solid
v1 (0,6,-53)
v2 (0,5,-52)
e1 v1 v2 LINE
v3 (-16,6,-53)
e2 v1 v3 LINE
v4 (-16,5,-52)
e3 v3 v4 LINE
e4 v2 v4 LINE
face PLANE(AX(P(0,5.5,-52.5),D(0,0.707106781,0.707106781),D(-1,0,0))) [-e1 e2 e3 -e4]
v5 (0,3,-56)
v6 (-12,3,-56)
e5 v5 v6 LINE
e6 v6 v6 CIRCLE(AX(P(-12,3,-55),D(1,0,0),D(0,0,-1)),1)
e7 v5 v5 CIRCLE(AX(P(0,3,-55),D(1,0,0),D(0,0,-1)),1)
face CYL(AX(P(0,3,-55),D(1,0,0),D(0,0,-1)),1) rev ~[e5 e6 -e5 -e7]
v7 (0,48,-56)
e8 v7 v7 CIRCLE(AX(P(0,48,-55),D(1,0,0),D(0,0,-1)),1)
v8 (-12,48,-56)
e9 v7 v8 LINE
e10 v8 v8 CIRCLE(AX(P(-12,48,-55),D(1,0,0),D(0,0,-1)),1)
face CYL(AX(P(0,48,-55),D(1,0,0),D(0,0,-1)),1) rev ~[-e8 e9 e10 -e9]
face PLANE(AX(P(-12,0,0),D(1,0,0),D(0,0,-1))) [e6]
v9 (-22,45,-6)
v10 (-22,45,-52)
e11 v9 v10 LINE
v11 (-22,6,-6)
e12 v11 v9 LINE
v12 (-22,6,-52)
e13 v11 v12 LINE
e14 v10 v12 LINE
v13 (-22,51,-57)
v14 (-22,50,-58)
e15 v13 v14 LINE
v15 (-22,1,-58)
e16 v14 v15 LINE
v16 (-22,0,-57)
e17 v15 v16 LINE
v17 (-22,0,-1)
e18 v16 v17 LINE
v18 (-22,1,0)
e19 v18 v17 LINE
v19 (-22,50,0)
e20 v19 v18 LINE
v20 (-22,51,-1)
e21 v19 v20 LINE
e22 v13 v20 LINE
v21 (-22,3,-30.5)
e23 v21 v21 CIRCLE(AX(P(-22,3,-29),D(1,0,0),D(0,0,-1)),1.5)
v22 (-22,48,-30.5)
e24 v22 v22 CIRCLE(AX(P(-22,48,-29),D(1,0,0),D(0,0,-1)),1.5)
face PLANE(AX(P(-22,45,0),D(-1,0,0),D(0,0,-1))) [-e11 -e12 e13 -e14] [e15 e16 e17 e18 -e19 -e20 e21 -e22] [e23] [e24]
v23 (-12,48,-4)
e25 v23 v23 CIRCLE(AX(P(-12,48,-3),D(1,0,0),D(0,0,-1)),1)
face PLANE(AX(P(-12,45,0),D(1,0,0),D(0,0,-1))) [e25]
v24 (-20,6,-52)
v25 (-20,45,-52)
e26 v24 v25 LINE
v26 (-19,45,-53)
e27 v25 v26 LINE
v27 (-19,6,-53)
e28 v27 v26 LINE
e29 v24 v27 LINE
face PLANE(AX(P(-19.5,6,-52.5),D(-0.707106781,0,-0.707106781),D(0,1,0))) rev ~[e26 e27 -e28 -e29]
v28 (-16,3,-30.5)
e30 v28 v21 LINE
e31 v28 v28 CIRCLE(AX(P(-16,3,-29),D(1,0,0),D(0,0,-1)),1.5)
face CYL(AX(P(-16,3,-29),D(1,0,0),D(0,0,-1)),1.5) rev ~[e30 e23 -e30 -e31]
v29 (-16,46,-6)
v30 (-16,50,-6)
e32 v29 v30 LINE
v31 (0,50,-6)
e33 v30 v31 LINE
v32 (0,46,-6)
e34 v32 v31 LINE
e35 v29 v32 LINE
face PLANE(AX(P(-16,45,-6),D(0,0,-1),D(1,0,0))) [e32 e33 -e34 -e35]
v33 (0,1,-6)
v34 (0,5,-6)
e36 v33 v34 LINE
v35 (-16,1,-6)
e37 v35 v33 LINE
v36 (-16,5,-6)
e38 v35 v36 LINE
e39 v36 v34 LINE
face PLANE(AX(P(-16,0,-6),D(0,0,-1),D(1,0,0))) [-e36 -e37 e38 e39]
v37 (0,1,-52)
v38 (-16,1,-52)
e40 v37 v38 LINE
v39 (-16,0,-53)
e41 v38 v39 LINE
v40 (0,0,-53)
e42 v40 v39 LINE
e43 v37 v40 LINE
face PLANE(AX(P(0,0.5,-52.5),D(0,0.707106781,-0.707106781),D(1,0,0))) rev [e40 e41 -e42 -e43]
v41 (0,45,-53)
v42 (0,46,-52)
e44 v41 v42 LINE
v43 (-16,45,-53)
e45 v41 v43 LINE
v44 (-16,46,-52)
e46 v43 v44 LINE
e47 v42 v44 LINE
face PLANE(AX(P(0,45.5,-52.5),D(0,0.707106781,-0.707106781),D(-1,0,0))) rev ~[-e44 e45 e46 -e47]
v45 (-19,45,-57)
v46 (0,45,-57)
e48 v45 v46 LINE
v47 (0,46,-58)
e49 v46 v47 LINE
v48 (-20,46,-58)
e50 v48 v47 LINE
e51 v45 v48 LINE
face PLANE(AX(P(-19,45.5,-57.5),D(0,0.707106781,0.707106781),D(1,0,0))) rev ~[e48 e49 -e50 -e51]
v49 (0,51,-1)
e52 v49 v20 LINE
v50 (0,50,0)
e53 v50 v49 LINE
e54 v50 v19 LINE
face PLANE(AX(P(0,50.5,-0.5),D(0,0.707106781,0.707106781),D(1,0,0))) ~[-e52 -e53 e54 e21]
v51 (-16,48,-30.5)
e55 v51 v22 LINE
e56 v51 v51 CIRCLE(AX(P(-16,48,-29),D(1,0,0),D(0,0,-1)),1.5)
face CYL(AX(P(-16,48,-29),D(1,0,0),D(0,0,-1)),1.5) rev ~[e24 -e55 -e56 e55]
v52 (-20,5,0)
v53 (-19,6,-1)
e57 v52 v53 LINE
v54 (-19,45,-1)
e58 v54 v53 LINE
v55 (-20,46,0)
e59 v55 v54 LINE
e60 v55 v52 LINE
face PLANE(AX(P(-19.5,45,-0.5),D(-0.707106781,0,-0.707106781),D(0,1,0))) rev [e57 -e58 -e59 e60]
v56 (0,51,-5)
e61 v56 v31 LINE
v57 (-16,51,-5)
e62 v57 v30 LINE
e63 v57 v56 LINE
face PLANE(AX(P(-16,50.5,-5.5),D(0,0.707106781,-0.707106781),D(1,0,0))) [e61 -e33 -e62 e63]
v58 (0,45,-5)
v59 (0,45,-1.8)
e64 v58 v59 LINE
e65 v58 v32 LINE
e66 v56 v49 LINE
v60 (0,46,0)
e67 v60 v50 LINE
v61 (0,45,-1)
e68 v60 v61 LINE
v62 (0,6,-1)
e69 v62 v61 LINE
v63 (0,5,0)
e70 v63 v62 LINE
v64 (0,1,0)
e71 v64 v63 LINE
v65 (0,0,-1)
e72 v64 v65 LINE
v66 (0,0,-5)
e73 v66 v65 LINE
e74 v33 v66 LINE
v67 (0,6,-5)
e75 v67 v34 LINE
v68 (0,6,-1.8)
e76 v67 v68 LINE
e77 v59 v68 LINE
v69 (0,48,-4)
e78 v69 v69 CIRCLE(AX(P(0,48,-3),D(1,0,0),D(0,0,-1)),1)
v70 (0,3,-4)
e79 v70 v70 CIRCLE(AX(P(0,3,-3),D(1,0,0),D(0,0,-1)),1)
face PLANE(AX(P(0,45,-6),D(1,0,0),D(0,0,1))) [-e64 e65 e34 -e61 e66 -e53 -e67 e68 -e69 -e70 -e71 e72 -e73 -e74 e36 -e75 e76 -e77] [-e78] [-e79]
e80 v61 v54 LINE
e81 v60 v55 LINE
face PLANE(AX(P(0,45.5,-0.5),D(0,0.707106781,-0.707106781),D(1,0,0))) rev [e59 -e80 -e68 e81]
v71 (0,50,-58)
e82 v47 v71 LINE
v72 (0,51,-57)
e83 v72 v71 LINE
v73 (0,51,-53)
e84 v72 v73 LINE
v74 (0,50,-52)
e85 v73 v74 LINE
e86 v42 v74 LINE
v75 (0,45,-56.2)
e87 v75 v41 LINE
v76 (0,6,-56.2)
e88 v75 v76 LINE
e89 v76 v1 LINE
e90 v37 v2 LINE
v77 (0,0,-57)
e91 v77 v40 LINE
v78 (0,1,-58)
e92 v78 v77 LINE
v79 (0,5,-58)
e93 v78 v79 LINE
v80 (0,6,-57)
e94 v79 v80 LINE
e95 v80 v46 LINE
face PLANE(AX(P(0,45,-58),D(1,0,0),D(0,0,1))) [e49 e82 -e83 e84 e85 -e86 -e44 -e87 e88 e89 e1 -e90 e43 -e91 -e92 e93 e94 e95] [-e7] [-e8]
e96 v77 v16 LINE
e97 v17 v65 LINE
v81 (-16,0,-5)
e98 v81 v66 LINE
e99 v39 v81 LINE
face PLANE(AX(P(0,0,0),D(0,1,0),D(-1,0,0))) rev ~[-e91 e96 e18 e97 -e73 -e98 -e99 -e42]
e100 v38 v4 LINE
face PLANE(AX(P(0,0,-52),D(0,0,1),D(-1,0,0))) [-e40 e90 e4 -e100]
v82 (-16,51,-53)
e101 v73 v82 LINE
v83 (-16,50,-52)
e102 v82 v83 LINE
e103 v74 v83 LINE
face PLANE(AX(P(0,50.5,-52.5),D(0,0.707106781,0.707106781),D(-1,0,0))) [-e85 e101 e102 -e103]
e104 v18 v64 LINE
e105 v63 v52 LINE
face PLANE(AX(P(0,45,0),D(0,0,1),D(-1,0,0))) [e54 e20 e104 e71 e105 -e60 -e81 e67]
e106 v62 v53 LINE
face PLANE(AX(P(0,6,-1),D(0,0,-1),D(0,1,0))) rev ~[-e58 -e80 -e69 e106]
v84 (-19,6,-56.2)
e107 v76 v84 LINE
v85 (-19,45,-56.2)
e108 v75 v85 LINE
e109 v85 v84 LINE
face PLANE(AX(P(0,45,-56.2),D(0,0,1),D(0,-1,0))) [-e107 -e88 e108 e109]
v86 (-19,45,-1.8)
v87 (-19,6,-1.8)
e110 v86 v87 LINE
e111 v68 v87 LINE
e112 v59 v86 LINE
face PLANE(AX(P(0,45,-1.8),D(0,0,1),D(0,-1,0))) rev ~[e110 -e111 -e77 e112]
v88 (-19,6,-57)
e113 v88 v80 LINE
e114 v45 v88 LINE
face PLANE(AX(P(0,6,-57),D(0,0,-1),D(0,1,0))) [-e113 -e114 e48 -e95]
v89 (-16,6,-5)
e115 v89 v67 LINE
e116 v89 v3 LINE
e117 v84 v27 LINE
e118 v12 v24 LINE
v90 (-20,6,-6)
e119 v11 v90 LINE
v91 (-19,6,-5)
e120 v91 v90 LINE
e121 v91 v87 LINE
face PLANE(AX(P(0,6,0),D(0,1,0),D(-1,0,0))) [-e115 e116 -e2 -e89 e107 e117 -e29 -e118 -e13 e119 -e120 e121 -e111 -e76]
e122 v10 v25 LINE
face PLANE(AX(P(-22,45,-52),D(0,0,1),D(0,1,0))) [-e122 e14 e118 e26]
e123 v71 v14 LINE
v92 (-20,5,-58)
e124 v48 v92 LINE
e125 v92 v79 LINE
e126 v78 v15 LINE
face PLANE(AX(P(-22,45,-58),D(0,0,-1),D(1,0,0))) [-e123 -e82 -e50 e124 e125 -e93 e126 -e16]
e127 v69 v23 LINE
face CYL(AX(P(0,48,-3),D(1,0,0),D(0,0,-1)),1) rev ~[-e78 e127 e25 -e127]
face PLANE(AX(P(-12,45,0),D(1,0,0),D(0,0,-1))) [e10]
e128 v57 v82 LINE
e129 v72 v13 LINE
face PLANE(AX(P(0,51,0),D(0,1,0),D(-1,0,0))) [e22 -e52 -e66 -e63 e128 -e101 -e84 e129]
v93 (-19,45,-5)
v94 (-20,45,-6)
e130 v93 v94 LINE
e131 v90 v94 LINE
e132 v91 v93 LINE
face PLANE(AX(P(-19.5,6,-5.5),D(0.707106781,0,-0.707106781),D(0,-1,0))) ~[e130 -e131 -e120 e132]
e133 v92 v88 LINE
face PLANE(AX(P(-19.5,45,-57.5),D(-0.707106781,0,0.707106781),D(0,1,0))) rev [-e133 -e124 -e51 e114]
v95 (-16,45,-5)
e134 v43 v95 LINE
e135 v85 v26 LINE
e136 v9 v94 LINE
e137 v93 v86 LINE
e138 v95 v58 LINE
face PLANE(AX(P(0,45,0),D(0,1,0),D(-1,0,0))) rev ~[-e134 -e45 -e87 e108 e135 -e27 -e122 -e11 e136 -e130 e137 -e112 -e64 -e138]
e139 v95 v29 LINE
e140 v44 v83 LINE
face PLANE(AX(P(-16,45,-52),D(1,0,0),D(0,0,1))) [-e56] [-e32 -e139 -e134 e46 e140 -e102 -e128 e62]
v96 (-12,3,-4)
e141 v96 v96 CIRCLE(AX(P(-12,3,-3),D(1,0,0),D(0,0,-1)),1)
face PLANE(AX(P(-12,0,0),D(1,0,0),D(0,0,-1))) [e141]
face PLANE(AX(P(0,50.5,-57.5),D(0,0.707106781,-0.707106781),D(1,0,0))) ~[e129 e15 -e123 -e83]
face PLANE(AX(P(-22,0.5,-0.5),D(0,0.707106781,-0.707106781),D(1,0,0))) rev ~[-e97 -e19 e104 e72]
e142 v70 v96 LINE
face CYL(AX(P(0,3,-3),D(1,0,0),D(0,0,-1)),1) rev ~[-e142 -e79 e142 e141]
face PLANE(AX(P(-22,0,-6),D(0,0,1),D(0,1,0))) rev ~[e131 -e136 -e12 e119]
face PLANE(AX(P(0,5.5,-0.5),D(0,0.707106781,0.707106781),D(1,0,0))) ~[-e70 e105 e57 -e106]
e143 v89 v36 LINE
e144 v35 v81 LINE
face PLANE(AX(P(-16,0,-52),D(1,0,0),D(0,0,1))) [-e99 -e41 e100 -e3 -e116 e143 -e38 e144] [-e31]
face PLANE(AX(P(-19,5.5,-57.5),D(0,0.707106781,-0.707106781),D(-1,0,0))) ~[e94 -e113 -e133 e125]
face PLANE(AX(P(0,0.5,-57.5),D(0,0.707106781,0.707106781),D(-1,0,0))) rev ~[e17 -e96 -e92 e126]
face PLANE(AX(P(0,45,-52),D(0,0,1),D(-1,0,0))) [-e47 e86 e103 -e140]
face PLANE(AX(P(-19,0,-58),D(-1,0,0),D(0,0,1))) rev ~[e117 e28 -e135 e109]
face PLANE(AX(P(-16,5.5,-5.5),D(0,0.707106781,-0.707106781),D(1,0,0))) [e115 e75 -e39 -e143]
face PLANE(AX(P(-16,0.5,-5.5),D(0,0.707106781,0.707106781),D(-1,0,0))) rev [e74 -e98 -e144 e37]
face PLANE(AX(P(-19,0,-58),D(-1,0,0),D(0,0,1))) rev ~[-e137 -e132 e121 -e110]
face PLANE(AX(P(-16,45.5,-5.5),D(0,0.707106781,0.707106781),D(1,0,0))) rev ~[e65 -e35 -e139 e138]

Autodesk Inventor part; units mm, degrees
ref_plane "YZ Plane" through (0, 0, 0) normal (1, 0, 0) x (0, 1, 0)
ref_plane "XZ Plane" through (0, 0, 0) normal (0, 1, 0) x (-1, 0, 0)
ref_plane "XY Plane" through (0, 0, 0) normal (0, 0, 1) x (1, 0, 0)
sketch "Sketch1" plane through (0, 0, 0) normal (0, 1, 0) x (-1, 0, 0)
  line L0 (0, 0) -> (22, 0)
  line L1 (22, 0) -> (22, -58)
  line L2 (22, -58) -> (0, -58)
  line L3 (0, -58) -> (0, -52)
  line L4 (0, -52) -> (16, -52)
  line L5 (16, -52) -> (16, -6)
  line L6 (16, -6) -> (0, -6)
  line L7 (0, -6) -> (0, 0)
  dimension "d0" = 6
  dimension "d1" = 6
  dimension "d2" = 58
  dimension "d3" = 22
extrude "Extrusion1" add sketch "Sketch1" along normal blind 6
sketch "Sketch2" plane through (0, 0, 0) normal (1, 0, 0) x (0, 0, -1)
  line L0 (6, 6) -> (52, 6) projected
  line L1 (0, 0) -> (6, 6) construction
  line L2 (58, 0) -> (58, 6) projected
  line L3 (52, 6) -> (58, 0) construction
  circle A0 centre (3, 3) radius 1
  circle A1 centre (55, 3) radius 1
  dimension "d6" = 2
extrude "Extrusion2" cut sketch "Sketch2" against normal blind 12
sketch "Sketch3" plane through (-16, 0, -6) normal (1, 0, 0) x (0, 0, -1)
  line L0 (0, 6) -> (46, 6) projected
  line L1 (23, 6) -> (23, 0) construction
  circle A0 centre (23, 3) radius 1.5
  line L2 (0, 0) -> (46, 0) projected
  point P0 (-6, 0)
  dimension "d9" = 3
extrude "Extrusion3" cut sketch "Sketch3" against normal through all
pattern_linear "Rectangular Pattern2" count 2 spacing 45 along (0, 1, 0) of "Extrusion1", "Extrusion3", "Extrusion2"
sketch "Sketch5" plane through (-22, 0, -58) normal (-1, 0, 0) x (0, 0, 1)
  line L0 (58, 0) -> (52, 0) projected
  line L1 (52, 51) -> (6, 51) projected
  line L2 (58, 0) -> (52, 0)
  line L3 (52, 0) -> (52, 51)
  line L4 (52, 51) -> (58, 51)
  line L5 (58, 51) -> (58, 0)
  line L6 (6, 0) -> (0, 0) projected
  line L7 (6, 45) -> (6, 51) projected
  line L8 (0, 0) -> (6, 0)
  line L9 (6, 0) -> (6, 51)
  line L10 (6, 51) -> (0, 51)
  line L11 (0, 51) -> (0, 0)
extrude "Extrusion4" add sketch "Sketch5" against normal blind 3
chamfer "Chamfer3" distance 1 angle 45 20 edges at (-11, 51, 0) (-9.5, 45, 0) (-8, 51, -6) (-8, 45, -52) (-8, 51, -52) (-11, 51, -58) (-9.5, 6, -58) (-8, 6, -52) (-8, 0, -52) (-8, 6, -6) (-9.5, 6, 0) (-11, 0, 0) (-8, 45, -6) (-8, 0, -6) (-11, 0, -58) (-9.5, 45, -58) (-19, 25.5, -6) (-19, 25.5, 0) (-19, 25.5, -52) (-19, 25.5, -58)
sketch "Sketch6" plane through (0, 45, -1) normal (1, 0, 0) x (0, 0, -1)
  point P0 (-1, -45)
sketch "Sketch7" plane through (0, 45, -53) normal (1, 0, 0) x (0, 0, -1)
  line L0 (-52, 0) -> (-48, 0) projected
  line L1 (-52, -39) -> (-48, -39) projected
  line L2 (-52, 0) -> (-51.2, 0)
  line L3 (-51.2, 0) -> (-51.2, -39)
  line L4 (-51.2, -39) -> (-52, -39)
  line L5 (-52, -39) -> (-52, 0)
  line L6 (0, 0) -> (4, 0) projected
  line L7 (4, 0) -> (3.2, 0)
  line L8 (3.2, 0) -> (3.2, -39)
  line L9 (3.2, -39) -> (4, -39)
  line L10 (4, -39) -> (4, 0)
  line L11 (0, -39) -> (4, -39) projected
  point P0 (-53, -45)
  point P1 (3.2, 0)
  dimension "d29" = 0.8
  dimension "d30" = 0.8
extrude "Extrusion5" add sketch "Sketch7" against normal up to surface (19 mm away)
equation "\"d30\" = d29"
properties part number "batt-standoff"
